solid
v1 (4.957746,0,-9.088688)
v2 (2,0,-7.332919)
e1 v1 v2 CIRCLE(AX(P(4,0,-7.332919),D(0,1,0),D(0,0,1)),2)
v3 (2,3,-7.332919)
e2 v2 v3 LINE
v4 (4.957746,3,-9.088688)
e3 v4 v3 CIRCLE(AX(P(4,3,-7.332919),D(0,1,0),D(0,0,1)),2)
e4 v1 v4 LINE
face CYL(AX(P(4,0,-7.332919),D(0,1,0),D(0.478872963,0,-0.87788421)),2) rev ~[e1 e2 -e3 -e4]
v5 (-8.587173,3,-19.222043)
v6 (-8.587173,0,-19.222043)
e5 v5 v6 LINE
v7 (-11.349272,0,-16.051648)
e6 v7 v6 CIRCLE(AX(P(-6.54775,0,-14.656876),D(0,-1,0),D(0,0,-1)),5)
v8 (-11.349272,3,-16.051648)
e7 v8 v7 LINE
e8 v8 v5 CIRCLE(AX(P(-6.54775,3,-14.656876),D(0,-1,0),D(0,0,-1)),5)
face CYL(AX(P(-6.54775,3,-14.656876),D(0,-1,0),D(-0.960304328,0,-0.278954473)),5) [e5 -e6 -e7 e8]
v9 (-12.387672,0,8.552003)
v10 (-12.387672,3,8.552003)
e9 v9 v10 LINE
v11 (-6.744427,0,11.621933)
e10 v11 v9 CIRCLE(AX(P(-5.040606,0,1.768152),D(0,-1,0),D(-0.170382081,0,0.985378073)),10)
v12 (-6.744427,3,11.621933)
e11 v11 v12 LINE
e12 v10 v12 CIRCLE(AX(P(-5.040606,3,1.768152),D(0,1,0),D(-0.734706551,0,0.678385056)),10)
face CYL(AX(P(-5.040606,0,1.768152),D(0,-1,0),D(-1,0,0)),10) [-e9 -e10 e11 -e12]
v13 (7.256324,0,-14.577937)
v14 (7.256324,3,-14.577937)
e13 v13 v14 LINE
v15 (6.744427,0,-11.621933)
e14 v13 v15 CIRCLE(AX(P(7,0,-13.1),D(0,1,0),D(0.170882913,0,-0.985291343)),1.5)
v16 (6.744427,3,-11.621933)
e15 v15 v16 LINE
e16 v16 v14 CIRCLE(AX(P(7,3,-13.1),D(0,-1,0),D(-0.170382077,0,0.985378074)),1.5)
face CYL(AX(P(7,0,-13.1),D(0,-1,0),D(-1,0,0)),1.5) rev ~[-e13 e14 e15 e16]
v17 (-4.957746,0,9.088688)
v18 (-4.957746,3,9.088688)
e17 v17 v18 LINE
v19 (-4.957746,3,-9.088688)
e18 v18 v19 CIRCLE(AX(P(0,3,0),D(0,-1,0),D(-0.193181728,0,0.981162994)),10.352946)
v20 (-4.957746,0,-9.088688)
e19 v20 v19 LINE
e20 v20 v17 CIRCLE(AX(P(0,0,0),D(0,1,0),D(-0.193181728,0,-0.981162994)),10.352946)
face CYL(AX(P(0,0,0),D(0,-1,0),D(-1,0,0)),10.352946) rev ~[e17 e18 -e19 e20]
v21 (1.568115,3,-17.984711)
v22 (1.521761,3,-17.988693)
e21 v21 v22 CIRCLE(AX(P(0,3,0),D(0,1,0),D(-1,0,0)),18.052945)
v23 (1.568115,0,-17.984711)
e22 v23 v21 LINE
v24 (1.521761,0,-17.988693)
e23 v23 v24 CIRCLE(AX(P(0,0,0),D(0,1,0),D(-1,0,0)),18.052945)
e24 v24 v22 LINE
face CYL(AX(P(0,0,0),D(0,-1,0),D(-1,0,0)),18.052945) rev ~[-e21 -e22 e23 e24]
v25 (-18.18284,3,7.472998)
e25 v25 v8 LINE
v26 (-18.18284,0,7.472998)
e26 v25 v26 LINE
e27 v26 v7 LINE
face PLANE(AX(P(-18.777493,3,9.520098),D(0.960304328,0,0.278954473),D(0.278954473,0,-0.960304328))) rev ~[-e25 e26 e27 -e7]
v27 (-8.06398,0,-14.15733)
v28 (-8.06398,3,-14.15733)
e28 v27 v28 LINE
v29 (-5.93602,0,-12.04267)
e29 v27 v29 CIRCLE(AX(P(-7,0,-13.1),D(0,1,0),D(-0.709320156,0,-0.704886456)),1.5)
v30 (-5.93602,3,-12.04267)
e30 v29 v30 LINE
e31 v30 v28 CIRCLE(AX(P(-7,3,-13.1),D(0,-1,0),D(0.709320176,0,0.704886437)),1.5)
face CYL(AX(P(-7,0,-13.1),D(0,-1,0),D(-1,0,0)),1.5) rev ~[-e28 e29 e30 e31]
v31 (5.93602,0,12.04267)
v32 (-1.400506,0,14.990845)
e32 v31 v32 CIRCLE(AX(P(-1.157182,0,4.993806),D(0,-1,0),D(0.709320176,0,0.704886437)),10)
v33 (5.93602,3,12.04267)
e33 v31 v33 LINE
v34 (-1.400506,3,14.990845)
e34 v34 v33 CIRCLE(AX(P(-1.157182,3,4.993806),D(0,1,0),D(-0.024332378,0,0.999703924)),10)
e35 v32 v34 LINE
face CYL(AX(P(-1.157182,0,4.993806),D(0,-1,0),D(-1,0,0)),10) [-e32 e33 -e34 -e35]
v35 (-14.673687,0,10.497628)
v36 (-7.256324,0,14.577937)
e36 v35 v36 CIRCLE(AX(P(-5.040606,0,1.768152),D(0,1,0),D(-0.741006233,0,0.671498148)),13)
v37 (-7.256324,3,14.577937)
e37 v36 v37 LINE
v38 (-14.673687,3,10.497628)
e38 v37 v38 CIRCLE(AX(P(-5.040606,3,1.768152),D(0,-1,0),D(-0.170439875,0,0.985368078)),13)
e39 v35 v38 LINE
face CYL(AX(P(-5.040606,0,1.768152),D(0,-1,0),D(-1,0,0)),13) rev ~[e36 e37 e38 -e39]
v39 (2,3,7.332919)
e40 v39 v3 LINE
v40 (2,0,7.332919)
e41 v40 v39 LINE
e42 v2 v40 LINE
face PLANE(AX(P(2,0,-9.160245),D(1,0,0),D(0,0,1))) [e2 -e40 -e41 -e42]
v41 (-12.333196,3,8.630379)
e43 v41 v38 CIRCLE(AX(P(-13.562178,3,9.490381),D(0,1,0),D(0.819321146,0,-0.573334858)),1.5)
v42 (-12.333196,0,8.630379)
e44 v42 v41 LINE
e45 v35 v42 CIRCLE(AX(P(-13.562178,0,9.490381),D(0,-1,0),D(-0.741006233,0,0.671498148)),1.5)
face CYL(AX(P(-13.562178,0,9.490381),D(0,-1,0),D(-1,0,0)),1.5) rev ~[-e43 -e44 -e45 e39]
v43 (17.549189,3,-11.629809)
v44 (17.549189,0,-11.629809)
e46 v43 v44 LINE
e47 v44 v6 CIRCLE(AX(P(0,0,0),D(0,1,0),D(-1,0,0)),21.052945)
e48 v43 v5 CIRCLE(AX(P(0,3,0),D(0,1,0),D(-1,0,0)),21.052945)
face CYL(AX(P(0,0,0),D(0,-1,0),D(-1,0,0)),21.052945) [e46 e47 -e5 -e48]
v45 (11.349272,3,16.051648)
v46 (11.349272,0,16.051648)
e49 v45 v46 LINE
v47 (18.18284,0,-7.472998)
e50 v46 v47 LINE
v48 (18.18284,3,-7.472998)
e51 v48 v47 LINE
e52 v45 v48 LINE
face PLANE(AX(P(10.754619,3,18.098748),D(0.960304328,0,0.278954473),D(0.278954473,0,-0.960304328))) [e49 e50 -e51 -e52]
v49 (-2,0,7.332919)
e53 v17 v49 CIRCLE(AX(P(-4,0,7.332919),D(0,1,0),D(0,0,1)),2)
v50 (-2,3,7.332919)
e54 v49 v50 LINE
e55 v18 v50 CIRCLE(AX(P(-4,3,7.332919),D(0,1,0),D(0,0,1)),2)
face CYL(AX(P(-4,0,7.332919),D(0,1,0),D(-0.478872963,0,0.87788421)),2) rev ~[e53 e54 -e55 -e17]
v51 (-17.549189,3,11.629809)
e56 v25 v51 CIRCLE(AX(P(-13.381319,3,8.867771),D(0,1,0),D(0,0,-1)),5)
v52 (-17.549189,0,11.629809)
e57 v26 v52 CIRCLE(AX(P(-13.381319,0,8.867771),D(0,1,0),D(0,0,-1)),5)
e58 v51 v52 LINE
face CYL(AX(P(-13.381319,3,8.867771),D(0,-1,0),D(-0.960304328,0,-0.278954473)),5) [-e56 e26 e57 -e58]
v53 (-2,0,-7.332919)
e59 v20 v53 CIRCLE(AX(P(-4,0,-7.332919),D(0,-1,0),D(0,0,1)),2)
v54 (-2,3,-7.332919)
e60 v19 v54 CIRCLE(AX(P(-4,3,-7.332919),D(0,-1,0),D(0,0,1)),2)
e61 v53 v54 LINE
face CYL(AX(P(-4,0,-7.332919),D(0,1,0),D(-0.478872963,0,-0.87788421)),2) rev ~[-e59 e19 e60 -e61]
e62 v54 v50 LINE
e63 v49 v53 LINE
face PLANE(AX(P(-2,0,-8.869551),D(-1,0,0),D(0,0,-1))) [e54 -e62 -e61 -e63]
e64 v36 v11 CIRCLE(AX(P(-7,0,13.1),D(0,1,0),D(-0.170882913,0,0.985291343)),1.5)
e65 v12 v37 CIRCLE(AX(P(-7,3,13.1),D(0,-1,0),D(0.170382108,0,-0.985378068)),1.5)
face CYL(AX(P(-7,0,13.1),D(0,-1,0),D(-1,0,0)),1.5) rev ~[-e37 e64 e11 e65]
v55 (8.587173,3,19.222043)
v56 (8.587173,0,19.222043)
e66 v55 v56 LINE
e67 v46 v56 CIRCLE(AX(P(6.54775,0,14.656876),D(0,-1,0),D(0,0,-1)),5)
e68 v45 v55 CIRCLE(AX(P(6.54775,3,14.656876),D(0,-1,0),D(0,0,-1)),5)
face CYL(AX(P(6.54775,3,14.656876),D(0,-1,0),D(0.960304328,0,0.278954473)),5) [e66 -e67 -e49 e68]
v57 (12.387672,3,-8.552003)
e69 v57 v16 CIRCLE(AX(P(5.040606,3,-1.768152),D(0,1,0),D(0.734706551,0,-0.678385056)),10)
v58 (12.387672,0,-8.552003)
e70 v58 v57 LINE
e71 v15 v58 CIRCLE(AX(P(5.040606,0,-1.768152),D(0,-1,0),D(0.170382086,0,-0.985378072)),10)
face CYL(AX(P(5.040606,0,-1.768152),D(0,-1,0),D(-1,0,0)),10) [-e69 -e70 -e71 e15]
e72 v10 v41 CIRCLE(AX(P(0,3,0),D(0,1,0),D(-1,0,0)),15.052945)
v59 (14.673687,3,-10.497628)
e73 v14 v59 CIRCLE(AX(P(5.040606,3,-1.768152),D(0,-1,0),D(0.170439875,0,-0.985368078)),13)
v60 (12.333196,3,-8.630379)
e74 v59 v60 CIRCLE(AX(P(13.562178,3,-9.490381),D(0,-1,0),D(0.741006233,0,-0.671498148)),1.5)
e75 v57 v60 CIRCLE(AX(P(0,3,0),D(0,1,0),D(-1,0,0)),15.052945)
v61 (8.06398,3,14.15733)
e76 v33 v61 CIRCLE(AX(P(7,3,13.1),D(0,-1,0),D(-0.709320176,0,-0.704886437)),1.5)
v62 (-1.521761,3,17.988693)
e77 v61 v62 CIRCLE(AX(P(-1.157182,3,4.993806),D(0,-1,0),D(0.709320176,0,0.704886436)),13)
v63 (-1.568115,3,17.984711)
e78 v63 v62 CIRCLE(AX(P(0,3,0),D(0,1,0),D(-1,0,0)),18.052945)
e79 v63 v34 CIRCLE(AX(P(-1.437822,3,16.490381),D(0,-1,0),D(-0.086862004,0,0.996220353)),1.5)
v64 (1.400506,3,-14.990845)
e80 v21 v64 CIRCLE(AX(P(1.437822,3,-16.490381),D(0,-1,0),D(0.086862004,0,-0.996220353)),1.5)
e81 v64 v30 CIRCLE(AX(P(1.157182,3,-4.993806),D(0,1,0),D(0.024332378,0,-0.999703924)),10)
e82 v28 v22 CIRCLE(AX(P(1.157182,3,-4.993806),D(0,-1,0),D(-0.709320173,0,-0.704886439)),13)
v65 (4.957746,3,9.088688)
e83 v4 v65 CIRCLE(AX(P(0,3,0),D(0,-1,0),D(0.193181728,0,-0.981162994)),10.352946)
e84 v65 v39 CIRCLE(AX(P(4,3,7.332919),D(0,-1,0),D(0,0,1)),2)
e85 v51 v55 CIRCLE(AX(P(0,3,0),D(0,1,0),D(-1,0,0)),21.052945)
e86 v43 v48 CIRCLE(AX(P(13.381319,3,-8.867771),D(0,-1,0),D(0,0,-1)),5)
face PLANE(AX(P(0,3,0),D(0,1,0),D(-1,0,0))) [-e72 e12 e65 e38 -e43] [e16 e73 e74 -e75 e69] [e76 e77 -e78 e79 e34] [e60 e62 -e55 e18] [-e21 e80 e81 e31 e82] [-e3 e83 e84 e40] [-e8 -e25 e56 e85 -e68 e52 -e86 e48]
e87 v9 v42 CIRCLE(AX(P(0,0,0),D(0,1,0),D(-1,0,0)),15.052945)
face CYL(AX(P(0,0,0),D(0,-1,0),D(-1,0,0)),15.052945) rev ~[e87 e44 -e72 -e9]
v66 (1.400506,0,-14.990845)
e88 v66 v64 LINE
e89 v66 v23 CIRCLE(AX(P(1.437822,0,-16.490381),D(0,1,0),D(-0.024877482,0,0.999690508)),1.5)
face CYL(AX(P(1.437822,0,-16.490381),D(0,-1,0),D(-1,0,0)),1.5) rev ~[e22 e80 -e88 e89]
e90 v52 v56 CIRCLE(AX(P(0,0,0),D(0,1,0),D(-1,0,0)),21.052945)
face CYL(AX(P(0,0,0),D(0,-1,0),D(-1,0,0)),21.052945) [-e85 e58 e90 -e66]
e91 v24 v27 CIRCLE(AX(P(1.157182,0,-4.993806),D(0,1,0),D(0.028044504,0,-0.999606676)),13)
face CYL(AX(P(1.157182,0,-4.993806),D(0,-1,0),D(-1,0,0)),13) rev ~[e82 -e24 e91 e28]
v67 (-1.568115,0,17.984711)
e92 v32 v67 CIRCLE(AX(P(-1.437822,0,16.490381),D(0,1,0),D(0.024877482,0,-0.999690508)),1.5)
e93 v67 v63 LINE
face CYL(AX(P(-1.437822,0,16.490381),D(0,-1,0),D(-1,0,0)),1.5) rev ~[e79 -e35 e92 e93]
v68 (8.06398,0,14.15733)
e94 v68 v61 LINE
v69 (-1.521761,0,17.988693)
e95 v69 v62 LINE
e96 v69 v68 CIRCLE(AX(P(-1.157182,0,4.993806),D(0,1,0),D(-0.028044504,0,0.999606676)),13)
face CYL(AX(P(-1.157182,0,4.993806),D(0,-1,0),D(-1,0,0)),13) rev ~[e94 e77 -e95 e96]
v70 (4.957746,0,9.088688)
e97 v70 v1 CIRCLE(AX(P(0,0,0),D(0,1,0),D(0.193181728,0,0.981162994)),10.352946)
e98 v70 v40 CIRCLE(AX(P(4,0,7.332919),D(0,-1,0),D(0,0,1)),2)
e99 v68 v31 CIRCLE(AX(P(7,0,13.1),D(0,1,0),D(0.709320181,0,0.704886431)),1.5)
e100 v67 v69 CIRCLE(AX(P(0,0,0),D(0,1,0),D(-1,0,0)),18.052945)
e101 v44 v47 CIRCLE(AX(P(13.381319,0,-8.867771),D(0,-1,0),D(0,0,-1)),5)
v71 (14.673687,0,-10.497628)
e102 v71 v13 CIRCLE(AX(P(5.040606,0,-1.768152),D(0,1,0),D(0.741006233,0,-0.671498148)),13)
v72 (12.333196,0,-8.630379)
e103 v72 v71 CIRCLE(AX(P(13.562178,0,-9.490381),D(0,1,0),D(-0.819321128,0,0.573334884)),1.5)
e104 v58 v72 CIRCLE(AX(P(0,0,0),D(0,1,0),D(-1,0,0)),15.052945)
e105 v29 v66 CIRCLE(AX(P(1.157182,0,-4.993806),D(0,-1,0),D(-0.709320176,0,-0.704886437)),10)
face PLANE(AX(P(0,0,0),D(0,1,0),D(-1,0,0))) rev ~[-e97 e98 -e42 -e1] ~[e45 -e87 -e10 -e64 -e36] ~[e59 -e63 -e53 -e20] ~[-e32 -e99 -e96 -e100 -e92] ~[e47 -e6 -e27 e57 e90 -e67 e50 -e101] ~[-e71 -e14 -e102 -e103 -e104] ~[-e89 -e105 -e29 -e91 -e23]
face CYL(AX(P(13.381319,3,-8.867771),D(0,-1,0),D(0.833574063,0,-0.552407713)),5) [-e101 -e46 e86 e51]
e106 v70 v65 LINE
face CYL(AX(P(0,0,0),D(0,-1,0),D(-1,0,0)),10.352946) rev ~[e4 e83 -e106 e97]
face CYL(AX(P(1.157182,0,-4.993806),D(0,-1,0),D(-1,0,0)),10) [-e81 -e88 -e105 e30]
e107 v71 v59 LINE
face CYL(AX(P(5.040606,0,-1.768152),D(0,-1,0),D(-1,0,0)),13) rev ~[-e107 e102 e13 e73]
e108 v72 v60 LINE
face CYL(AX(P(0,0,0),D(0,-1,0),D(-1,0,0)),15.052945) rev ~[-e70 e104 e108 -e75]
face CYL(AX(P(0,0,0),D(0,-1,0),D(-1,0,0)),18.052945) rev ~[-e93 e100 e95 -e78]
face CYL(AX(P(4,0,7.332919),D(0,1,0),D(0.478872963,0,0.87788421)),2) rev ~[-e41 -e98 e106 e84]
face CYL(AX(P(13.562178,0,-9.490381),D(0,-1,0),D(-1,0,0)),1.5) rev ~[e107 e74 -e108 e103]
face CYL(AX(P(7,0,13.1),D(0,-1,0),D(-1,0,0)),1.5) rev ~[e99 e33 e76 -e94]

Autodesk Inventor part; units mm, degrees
ref_plane "YZ Plane" through (0, 0, 0) normal (1, 0, 0) x (0, 1, 0)
ref_plane "XZ Plane" through (0, 0, 0) normal (0, 1, 0) x (-1, 0, 0)
ref_plane "XY Plane" through (0, 0, 0) normal (0, 0, 1) x (1, 0, 0)
sketch "Эскиз1" plane through (0, 0, 0) normal (0, 1, 0) x (-1, 0, 0)
  line L0 (-7, 13.1) -> (7, 13.1) construction
  line L1 (7, 13.1) -> (7, -13.1) construction
  line L2 (7, -13.1) -> (-7, -13.1) construction
  line L3 (-7, -13.1) -> (-7, 13.1) construction
  line L4 (-7, 13.1) -> (7, -13.1) construction
  line L5 (7, 13.1) -> (-7, -13.1) construction
  line L6 (-1.437822, -16.490381) -> (13.562178, 9.490381) construction
  line L7 (13.562178, 9.490381) -> (1.437822, 16.490381) construction
  line L8 (1.437822, 16.490381) -> (-13.562178, -9.490381) construction
  line L9 (-13.562178, -9.490381) -> (-1.437822, -16.490381) construction
  line L10 (-1.437822, -16.490381) -> (1.437822, 16.490381) construction
  line L11 (13.562178, 9.490381) -> (-13.562178, -9.490381) construction
  circle A0 centre (13.562178, 9.490381) radius 1.5
  circle A1 centre (1.437822, 16.490381) radius 1.5
  circle A2 centre (7, 13.1) radius 1.5
  circle A3 centre (-7, 13.1) radius 1.5
  circle A4 centre (-7, -13.1) radius 1.5
  circle A5 centre (7, -13.1) radius 1.5
  circle A6 centre (-1.437822, -16.490381) radius 1.5
  circle A7 centre (-13.562178, -9.490381) radius 1.5
  circle A8 centre (0, 0) radius 13.352946
  circle A9 centre (0, 0) radius 15.052945
  circle A10 centre (0, 0) radius 18.052945
  circle A11 centre (0, 0) radius 16.352946
  circle A12 centre (0, 0) radius 21.052945
  circle A13 centre (0, 0) radius 10.352946
  line L12 (-2, 10.352946) -> (2, 10.352946) construction
  line L13 (2, 10.352946) -> (2, -10.352946)
  line L14 (2, -10.352946) -> (-2, -10.352946) construction
  line L15 (-2, -10.352946) -> (-2, 10.352946)
  line L16 (-2, 10.352946) -> (2, -10.352946) construction
  line L17 (2, 10.352946) -> (-2, -10.352946) construction
  circle A14 centre (1.157182, 4.993806) radius 10
  circle A15 centre (1.157182, 4.993806) radius 13
  circle A16 centre (5.040606, 1.768152) radius 10
  circle A17 centre (5.040606, 1.768152) radius 13
  circle A18 centre (-1.157182, -4.993806) radius 10
  circle A19 centre (-1.157182, -4.993806) radius 13
  circle A20 centre (-5.040606, -1.768152) radius 10
  circle A21 centre (-5.040606, -1.768152) radius 13
  point P0 (6.29307, 11.77703)
  point P1 (1.307529, 14.996051)
  point P2 (-1.307529, -14.996051)
  point P3 (-6.29307, -11.77703)
  point P4 (-7.70693, -14.42297)
  point P5 (-6.29307, 11.77703)
  point P6 (-7.70693, 14.42297)
  point P7 (14.79116, 10.350383)
  point P8 (12.333196, 8.630379)
  point P9 (6.29307, -11.77703)
  point P10 (7.70693, -14.42297)
  point P11 (-14.79116, -10.350383)
  point P12 (-12.333196, -8.630379)
  point P13 (-2, 10.157927)
  point P14 (-2, -10.157927)
  point P15 (2, -10.157927)
  point P16 (2, 10.157927)
  point P17 (8.377519, -12.506332)
  point P18 (-14.189914, -8.128049)
  point P19 (14.189914, 8.128049)
  point P20 (-8.377519, 12.506332)
  point P21 (7.255573, 14.578067)
  point P22 (14.673687, 10.497628)
  point P23 (12.387672, 8.552003)
  point P24 (6.744427, 11.621933)
  point P25 (6.398093, -8.139281)
  point P26 (6.282627, -8.154417)
  point P27 (6.207779, -8.285346)
  point P28 (8.06398, -14.15733)
  point P29 (-1.474427, -17.989934)
  point P30 (-1.354811, -14.991853)
  point P31 (5.93602, -12.04267)
  point P32 (-7.255573, -14.578067)
  point P33 (-14.673687, -10.497628)
  point P34 (-12.387672, -8.552003)
  point P35 (-6.744427, -11.621933)
  point P36 (1.354811, 14.991853)
  point P37 (-5.93602, 12.04267)
  point P38 (-8.06398, 14.15733)
  point P39 (1.474427, 17.989934)
  dimension "d6" = 3
  dimension "d7" = 3
  dimension "d11" = 3
  dimension "d0" = 14
  dimension "d1" = 26.2
  dimension "d2" = 30
  dimension "d3" = 14
  dimension "d5" = 3
  dimension "d8" = 3
  dimension "d9" = 3
  dimension "d10" = 3
  dimension "d12" = 3
  dimension "d15" = 3
  dimension "d16" = 3
  dimension "d19" = 3
  dimension "d22" = 3
  dimension "d23" = 4
  dimension "d26" = 30
  dimension "d28" = 20
  dimension "d29" = 3
  dimension "d30" = 20
  dimension "d31" = 3
  dimension "d32" = 20
  dimension "d33" = 3
  dimension "d34" = 20
  dimension "d35" = 3
extrude "Выдавливание1" add sketch "Эскиз1" along normal blind 3 contours A0 A10 A17 A11 | A10 A17 | A0 A17 A10 | A11 A17 A9 A16 A15 A0 | A17 A15 A10 | A10 A6 A19 A11 A17 | A15 A16 A0 | A17 A11 A1 A10 A15 | A11 A19 A9 A17 | A10 A1 A15 | A16 A9 A0 | A16 A15 A9 | A16 A9 A15 | A17 A14 A1 A11 | A19 A10 A6 | A17 A19 A8 A16 A9 | A9 A19 A17 | A1 A15 A11 A21 A10 | A9 A15 A8 A14 A16 | A9 A16 A8 A15 | A2 A9 A14 A17 | A10 A19 A21 A11 A6 | A10 A21 A19 | A5 A9 A19 | A9 A5 A8 A17 A19 | A17 A8 A19 | A21 A11 A7 A10 | A10 A21 | A14 A8 A16 | A14 A17 A9 A1 | A2 A14 A9 | A14 A9 A17 | A11 A21 A18 A6 | A10 A7 A21 | A5 A18 A8 | A17 A18 A16 A19 A8 | A8 A18 A17 | A19 A16 A8 | A15 A9 A21 A11 | A21 A9 A20 A19 A7 A11 | A8 A16 A13 A21 A17 | A14 A19 A13 A16 A8 | A8 A15 A19 A14 | A16 A8 A2 | A16 A19 A15 A8 | A9 A17 A8 A14 | A2 A8 A17 A9 A14 | A18 A21 A9 A6 | A18 A9 A21 A8 | A18 A8 A21 A17 | A17 A21 A13 A16 A18 | A16 A18 A15 A19 | A3 A9 A15 | A21 A15 A8 A20 A9 | A9 A15 A21 | A15 A18 A13 A14 A19 | A8 A14 A21 | A8 A21 A15 A9 A3 | A14 A8 A3 | A17 A21 A14 A8 | A21 A4 A9 A18 | A18 A9 A21 | A8 A21 A9 A18 A4 | A21 A8 A20 A13 A17 | A17 A13 A21 | A16 A13 A15 A18 | A19 A20 A7 | A20 A8 A19 A9 | A9 A19 A20 | A21 A8 A15 | A16 A21 A13 | A13 L13 A21 A16 | A14 A13 A19 | A15 A13 A18 | A21 A13 A17 | A17 A13 A20 A14 A21 | A9 A4 A18 | A17 A20 L13 A13 | A13 A20 A17 | A20 A9 A7 | A20 A19 A9 | A19 A8 A18 A20 A9 | A20 A15 A19 A8 | A8 A15 A20 | A8 A21 A14 A20 A15 | A21 A16 L15 A13 | A21 L13 A19 L15 A16 | A4 A20 A8 | A20 A8 A18 A15 A13 | A13 L15 A17 A20 | A17 L15 A15 L13 A20 | A19 A15 A18 A8 | A20 A14 A19 A15 | A20 A13 A19 A14 | A20 A18 A8 | A19 A14 A13 A18 A15 | L13 A20 L15 A19 | A19 A13 A14 | A15 A18 A13 | A15 L15 A16 L13 | L13 A18 L15 A20 | A16 L15 A14 L13 | L13 A14 L15 A18 | A12 picked at (5.651458, 13.934035) picked at (-0.217232, 10.33749) picked at (-5.651458, -13.934035) picked at (0.217232, -10.33749)
fillet "Сопряжение1" radius 2 4 edges at (-2, 1.5, -10.1579) (-2, 1.5, 10.1579) (2, 1.5, 10.1579) (2, 1.5, -10.1579)
sketch "Эскиз2" plane through (0, 3, 0) normal (0, 1, 0) x (1, 0, 0)
  line L0 (-18.777493, -9.520098) -> (-10.754619, 18.098748)
  circle A0 centre (0, 0) radius 21.052945
  line L1 (10.754619, -18.098748) -> (18.777493, 9.520098)
  line L2 (0, 0) -> (0, 4.178964)
  line L3 (-18.777493, -9.520098) -> (10.754619, -18.098748) construction
  arc A1 (-12.333196, -8.630379) -> (-14.673687, -10.497628) centre (-13.562178, -9.490381) ccw
  arc A2 (-8.06398, 14.15733) -> (-5.93602, 12.04267) centre (-7, 13.1) ccw
  dimension "d38" = 5
  dimension "d40" = 5
extrude "Выдавливание2" cut sketch "Эскиз2" against normal blind 3 contours A0 L0 | L1 A0
fillet "Сопряжение2" radius 5 4 edges at (-18.7775, 1.5, 9.5201) (-10.7546, 1.5, -18.0987) (18.7775, 1.5, -9.5201) (10.7546, 1.5, 18.0987)
properties part number "krepezh"
